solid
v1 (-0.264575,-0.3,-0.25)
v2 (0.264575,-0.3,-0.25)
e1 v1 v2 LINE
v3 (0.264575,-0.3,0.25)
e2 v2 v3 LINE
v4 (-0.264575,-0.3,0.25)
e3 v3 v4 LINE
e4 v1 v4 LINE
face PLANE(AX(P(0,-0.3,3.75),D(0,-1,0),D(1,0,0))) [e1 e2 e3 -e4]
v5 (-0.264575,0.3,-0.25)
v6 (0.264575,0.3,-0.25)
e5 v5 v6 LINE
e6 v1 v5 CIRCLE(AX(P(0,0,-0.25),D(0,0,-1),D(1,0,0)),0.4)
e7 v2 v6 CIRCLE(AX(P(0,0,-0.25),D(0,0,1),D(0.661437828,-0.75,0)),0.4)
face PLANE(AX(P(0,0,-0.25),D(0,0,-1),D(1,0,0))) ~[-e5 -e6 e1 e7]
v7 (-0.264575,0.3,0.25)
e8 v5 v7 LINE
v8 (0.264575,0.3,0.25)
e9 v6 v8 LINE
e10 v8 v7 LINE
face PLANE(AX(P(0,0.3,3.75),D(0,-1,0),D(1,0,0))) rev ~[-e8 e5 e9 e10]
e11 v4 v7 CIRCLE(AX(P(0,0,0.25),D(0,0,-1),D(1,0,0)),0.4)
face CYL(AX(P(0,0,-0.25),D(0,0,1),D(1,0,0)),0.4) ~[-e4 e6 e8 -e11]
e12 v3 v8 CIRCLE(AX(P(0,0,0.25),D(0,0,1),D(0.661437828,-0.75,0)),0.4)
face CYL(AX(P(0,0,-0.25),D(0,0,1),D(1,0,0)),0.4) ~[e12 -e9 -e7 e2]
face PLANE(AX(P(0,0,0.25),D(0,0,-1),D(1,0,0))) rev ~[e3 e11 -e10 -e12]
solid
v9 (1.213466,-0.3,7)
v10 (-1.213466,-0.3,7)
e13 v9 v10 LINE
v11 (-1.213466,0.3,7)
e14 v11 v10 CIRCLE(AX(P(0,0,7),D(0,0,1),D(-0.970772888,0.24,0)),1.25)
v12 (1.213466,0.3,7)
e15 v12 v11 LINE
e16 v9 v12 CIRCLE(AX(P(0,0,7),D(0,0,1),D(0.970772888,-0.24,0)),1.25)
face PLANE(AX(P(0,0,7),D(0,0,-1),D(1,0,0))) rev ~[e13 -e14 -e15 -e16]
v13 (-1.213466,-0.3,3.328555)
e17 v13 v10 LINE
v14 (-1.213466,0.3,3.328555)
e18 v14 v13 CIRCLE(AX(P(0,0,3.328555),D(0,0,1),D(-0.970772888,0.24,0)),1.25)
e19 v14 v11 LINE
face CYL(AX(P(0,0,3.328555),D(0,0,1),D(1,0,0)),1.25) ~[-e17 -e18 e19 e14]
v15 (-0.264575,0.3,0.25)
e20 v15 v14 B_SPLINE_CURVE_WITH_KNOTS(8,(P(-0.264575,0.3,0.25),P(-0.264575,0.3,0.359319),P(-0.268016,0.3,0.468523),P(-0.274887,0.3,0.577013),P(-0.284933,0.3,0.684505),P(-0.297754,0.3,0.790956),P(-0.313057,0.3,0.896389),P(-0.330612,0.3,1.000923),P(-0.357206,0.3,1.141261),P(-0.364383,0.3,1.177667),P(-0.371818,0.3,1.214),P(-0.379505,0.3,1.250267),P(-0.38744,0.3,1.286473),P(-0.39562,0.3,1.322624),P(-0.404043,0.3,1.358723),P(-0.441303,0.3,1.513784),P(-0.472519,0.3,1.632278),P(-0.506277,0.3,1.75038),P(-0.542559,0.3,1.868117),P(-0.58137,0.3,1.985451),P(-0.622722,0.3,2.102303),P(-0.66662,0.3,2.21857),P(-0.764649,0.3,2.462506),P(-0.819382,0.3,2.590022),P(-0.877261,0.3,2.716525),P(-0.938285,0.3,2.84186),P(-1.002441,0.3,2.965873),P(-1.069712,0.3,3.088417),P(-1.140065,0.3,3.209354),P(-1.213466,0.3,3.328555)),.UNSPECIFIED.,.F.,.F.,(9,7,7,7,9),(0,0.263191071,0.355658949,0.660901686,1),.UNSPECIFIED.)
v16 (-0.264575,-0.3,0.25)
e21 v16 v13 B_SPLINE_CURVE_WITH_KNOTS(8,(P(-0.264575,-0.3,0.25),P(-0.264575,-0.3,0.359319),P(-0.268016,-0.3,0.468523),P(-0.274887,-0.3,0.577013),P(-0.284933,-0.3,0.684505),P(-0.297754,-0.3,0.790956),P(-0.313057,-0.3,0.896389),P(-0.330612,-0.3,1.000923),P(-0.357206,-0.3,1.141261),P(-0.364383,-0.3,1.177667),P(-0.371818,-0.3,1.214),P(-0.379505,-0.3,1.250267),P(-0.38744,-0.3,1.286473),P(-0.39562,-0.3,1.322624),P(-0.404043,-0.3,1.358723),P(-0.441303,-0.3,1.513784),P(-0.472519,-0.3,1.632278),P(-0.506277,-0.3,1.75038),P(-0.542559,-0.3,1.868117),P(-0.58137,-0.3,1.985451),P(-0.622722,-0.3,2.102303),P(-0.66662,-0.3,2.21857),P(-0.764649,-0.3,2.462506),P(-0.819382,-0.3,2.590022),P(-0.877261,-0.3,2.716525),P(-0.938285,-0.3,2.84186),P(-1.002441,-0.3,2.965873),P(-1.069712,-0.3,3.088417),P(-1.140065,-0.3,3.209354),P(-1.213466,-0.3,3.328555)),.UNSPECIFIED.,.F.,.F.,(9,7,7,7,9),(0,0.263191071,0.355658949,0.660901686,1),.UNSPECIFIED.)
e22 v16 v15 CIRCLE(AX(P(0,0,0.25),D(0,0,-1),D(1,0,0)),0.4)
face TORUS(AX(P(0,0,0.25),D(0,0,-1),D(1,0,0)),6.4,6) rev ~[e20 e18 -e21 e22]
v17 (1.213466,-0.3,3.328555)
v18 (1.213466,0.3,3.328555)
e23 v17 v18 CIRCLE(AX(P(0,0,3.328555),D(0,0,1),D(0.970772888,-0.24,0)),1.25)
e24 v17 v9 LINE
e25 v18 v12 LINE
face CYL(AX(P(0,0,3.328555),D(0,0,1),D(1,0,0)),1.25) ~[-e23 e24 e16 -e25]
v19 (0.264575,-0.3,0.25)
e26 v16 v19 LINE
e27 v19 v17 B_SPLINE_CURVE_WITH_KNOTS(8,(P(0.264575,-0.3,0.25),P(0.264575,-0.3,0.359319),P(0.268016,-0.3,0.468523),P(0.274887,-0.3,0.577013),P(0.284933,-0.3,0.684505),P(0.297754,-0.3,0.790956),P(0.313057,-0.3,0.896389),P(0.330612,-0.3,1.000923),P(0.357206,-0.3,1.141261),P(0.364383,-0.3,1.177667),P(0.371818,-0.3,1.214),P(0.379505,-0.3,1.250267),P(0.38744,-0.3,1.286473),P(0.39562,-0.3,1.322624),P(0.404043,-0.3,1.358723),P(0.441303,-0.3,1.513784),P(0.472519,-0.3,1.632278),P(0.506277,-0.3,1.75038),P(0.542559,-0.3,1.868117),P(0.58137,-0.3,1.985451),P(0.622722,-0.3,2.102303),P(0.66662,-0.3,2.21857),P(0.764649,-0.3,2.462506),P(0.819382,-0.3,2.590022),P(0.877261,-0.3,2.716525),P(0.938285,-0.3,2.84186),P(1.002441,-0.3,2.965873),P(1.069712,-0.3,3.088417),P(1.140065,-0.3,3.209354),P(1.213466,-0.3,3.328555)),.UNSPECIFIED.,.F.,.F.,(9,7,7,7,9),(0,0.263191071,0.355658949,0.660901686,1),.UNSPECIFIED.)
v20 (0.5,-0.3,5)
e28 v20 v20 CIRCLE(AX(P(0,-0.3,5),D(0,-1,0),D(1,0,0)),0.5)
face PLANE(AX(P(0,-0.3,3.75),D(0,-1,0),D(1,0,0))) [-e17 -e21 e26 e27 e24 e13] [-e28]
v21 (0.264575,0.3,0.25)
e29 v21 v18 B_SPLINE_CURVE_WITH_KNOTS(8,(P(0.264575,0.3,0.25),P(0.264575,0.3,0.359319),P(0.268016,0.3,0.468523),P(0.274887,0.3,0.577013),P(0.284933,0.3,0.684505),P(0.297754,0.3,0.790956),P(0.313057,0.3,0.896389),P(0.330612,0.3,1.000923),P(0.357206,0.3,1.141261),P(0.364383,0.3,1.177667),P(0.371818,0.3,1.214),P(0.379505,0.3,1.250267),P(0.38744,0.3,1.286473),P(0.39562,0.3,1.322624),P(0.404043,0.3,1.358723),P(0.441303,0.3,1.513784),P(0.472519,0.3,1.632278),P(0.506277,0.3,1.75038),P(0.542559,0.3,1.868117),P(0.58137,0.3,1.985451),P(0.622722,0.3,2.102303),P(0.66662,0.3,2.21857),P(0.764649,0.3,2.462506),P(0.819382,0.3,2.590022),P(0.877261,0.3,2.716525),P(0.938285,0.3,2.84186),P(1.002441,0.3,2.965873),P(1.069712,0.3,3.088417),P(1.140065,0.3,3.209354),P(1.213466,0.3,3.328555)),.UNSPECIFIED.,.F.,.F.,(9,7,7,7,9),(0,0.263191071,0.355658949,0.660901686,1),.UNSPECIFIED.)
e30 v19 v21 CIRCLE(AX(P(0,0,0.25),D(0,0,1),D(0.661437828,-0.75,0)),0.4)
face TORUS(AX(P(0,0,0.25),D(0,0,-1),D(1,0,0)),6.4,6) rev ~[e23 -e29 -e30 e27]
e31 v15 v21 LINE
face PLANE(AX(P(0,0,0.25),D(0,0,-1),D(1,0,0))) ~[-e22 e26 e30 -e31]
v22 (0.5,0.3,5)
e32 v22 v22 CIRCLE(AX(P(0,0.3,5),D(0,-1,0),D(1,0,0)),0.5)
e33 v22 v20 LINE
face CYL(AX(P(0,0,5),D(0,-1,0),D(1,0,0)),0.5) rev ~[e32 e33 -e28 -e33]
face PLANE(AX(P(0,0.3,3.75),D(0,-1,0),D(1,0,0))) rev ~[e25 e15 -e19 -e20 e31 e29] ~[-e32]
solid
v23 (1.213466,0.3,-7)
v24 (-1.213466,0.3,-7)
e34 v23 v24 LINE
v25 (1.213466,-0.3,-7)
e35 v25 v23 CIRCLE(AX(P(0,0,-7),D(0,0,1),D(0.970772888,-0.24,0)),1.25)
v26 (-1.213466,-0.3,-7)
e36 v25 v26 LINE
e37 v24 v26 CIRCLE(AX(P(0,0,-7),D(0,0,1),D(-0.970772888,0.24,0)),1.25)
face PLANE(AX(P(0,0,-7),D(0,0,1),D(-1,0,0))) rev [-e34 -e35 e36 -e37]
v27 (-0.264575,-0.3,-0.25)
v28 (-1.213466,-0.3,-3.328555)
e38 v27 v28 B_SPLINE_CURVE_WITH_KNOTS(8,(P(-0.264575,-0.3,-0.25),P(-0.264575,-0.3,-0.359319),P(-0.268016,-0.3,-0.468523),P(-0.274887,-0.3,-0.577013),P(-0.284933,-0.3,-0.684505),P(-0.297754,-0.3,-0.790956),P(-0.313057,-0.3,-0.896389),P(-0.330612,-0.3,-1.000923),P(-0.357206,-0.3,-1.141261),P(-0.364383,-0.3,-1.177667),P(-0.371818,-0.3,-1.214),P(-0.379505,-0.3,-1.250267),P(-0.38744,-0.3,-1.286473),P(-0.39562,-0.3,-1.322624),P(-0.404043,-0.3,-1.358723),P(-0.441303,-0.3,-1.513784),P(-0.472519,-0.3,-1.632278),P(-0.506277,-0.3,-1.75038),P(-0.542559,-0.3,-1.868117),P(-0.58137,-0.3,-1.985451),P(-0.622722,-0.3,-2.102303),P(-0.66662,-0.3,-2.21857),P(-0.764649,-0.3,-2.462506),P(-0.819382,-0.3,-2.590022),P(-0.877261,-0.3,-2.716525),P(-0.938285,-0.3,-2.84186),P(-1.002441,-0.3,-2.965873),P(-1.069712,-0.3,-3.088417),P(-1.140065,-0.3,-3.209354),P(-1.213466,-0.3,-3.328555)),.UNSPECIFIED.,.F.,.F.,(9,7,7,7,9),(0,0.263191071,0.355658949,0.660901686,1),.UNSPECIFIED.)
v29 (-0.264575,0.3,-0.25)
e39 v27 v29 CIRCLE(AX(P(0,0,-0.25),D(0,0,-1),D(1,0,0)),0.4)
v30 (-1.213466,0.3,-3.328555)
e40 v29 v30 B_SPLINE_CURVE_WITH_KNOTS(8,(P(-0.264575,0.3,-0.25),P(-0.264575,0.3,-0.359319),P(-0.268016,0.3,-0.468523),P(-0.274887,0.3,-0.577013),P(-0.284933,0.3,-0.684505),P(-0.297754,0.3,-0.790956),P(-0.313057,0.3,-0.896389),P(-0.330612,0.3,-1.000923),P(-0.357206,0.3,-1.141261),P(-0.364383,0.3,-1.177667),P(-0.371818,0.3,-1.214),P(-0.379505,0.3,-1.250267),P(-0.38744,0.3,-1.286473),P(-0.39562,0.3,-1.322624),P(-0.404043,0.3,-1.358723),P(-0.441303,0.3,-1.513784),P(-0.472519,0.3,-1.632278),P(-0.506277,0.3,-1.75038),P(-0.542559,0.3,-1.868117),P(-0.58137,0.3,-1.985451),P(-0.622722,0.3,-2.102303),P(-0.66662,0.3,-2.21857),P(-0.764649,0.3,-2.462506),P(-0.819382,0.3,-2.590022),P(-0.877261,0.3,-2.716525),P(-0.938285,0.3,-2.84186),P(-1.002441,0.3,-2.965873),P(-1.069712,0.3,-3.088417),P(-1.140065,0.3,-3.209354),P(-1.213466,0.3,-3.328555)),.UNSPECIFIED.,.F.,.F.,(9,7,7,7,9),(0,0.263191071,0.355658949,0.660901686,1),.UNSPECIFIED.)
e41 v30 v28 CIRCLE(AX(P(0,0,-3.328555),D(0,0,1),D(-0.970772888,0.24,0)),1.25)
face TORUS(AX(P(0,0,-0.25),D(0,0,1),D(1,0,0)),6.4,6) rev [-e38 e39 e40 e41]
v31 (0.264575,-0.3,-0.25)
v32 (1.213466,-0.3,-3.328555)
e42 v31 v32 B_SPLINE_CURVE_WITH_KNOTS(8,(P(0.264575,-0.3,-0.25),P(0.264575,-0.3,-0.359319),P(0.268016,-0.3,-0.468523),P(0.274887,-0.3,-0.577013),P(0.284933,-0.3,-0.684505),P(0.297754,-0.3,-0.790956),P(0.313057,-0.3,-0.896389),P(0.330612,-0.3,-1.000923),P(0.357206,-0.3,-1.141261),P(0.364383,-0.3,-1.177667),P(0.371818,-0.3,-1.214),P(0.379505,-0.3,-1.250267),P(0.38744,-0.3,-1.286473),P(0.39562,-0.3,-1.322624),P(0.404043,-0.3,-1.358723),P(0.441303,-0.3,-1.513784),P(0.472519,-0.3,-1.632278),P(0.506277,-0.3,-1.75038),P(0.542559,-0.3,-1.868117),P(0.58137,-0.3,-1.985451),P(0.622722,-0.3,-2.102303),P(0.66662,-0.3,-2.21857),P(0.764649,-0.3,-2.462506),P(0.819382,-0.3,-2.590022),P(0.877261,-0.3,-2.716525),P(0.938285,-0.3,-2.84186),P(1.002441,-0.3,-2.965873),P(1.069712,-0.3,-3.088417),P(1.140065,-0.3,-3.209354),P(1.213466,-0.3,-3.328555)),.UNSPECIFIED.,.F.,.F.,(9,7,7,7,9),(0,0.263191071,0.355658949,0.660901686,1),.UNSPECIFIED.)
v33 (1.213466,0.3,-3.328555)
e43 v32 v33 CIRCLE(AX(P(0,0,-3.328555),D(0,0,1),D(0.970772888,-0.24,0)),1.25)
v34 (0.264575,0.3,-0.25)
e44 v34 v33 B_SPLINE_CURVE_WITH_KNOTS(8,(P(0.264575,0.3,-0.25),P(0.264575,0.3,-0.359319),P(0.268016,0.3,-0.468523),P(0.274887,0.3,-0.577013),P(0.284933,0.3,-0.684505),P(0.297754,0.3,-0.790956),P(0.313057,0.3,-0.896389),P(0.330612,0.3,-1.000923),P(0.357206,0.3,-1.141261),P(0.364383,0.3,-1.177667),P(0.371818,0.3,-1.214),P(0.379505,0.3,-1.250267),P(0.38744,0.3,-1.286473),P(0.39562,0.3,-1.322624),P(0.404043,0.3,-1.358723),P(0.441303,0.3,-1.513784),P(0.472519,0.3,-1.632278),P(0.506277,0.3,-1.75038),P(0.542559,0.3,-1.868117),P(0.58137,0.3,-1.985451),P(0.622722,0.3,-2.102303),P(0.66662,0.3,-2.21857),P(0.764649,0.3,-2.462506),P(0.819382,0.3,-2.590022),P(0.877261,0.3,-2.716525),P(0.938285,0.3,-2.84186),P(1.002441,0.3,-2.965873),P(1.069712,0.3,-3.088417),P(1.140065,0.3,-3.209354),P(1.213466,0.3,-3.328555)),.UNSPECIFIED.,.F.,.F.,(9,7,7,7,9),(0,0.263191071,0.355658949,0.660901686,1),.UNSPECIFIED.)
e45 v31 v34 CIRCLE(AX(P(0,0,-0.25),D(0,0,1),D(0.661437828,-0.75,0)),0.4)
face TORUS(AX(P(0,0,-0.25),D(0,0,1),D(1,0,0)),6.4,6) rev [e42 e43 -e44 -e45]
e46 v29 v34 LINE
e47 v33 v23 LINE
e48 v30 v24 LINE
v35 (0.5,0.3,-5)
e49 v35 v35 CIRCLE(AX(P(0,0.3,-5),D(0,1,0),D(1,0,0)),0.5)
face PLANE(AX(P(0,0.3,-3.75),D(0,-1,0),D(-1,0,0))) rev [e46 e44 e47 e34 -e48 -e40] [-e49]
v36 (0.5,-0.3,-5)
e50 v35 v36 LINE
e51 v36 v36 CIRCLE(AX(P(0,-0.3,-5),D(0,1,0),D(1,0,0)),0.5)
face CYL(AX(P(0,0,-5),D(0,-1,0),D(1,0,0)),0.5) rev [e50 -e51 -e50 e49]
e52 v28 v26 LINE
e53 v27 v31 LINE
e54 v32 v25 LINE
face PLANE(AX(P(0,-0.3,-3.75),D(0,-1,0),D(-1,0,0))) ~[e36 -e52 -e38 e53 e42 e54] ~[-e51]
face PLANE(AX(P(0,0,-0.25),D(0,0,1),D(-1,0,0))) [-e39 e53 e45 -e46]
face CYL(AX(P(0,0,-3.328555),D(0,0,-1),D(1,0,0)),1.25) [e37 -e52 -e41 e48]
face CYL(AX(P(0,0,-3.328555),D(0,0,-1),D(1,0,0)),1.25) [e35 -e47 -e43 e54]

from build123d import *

# Parameters (mm, degrees)
F4_DEPTH = 0.3
F5_R     = 0.5
F6_DEPTH = 12.5


# Not quite as in the source:
# - a feature names something its author has since deleted; it is built from what else it names


with BuildPart() as f1:
    # F0 (on Front) → F1 (revolve)
    with BuildSketch(Plane.XZ):
        with BuildLine():
            Line((1.25, 7), (0, 7))
            Line((0, 7), (0, 0.25))
            Line((0, 0.25), (0.4, 0.25))
            ThreePointArc((0.4, 0.25), (0.6164025036, 1.8468719423), (1.25, 3.3285548558))
            Line((1.25, 3.3285548558), (1.25, 7))
        make_face()
    revolve(axis=Axis((0, 0, 3.5), (0, 0, -1)))


with BuildPart() as f2:
    # F0 (on Front) → F2 (revolve)
    with BuildSketch(Plane.XZ):
        Polygon((0.4, 0.25), (0, 0.25), (0, 0), (0, -0.25), (0.4, -0.25), align=None)
    revolve(axis=Axis((0, 0, 3.5), (0, 0, -1)))


with BuildPart() as f4_tool:
    # F3 (on Front) → F4 (new body, symmetric)
    with BuildSketch(Plane.XZ):
        Polygon((1.25, 0.25), (1.25, 7.75), (0, 7.75), (-1.25, 7.75), (-1.25, 0.25), (-1.25, -0.25), (0, -0.25), (1.25, -0.25), align=None)
    extrude(amount=F4_DEPTH, both=True)


with BuildPart() as f1_1:
    add(f1.part)

    # F4: intersect by f4_tool
    add(f4_tool.part, mode=Mode.INTERSECT)

    # F5 (on Front) → F6 (cut, symmetric)
    with BuildSketch(Plane.XZ):
        with Locations((0, 5)):
            Circle(F5_R)
    extrude(amount=F6_DEPTH, both=True, mode=Mode.SUBTRACT)


with BuildPart() as f2_1:
    add(f2.part)

    # F4: intersect by f4_tool
    add(f4_tool.part, mode=Mode.INTERSECT)


with BuildPart() as f7_1:
    # F7: instance of F1
    add(f1_1.part.mirror(Plane.XY))


solid = Compound([f1_1.part, f2_1.part, f7_1.part])
